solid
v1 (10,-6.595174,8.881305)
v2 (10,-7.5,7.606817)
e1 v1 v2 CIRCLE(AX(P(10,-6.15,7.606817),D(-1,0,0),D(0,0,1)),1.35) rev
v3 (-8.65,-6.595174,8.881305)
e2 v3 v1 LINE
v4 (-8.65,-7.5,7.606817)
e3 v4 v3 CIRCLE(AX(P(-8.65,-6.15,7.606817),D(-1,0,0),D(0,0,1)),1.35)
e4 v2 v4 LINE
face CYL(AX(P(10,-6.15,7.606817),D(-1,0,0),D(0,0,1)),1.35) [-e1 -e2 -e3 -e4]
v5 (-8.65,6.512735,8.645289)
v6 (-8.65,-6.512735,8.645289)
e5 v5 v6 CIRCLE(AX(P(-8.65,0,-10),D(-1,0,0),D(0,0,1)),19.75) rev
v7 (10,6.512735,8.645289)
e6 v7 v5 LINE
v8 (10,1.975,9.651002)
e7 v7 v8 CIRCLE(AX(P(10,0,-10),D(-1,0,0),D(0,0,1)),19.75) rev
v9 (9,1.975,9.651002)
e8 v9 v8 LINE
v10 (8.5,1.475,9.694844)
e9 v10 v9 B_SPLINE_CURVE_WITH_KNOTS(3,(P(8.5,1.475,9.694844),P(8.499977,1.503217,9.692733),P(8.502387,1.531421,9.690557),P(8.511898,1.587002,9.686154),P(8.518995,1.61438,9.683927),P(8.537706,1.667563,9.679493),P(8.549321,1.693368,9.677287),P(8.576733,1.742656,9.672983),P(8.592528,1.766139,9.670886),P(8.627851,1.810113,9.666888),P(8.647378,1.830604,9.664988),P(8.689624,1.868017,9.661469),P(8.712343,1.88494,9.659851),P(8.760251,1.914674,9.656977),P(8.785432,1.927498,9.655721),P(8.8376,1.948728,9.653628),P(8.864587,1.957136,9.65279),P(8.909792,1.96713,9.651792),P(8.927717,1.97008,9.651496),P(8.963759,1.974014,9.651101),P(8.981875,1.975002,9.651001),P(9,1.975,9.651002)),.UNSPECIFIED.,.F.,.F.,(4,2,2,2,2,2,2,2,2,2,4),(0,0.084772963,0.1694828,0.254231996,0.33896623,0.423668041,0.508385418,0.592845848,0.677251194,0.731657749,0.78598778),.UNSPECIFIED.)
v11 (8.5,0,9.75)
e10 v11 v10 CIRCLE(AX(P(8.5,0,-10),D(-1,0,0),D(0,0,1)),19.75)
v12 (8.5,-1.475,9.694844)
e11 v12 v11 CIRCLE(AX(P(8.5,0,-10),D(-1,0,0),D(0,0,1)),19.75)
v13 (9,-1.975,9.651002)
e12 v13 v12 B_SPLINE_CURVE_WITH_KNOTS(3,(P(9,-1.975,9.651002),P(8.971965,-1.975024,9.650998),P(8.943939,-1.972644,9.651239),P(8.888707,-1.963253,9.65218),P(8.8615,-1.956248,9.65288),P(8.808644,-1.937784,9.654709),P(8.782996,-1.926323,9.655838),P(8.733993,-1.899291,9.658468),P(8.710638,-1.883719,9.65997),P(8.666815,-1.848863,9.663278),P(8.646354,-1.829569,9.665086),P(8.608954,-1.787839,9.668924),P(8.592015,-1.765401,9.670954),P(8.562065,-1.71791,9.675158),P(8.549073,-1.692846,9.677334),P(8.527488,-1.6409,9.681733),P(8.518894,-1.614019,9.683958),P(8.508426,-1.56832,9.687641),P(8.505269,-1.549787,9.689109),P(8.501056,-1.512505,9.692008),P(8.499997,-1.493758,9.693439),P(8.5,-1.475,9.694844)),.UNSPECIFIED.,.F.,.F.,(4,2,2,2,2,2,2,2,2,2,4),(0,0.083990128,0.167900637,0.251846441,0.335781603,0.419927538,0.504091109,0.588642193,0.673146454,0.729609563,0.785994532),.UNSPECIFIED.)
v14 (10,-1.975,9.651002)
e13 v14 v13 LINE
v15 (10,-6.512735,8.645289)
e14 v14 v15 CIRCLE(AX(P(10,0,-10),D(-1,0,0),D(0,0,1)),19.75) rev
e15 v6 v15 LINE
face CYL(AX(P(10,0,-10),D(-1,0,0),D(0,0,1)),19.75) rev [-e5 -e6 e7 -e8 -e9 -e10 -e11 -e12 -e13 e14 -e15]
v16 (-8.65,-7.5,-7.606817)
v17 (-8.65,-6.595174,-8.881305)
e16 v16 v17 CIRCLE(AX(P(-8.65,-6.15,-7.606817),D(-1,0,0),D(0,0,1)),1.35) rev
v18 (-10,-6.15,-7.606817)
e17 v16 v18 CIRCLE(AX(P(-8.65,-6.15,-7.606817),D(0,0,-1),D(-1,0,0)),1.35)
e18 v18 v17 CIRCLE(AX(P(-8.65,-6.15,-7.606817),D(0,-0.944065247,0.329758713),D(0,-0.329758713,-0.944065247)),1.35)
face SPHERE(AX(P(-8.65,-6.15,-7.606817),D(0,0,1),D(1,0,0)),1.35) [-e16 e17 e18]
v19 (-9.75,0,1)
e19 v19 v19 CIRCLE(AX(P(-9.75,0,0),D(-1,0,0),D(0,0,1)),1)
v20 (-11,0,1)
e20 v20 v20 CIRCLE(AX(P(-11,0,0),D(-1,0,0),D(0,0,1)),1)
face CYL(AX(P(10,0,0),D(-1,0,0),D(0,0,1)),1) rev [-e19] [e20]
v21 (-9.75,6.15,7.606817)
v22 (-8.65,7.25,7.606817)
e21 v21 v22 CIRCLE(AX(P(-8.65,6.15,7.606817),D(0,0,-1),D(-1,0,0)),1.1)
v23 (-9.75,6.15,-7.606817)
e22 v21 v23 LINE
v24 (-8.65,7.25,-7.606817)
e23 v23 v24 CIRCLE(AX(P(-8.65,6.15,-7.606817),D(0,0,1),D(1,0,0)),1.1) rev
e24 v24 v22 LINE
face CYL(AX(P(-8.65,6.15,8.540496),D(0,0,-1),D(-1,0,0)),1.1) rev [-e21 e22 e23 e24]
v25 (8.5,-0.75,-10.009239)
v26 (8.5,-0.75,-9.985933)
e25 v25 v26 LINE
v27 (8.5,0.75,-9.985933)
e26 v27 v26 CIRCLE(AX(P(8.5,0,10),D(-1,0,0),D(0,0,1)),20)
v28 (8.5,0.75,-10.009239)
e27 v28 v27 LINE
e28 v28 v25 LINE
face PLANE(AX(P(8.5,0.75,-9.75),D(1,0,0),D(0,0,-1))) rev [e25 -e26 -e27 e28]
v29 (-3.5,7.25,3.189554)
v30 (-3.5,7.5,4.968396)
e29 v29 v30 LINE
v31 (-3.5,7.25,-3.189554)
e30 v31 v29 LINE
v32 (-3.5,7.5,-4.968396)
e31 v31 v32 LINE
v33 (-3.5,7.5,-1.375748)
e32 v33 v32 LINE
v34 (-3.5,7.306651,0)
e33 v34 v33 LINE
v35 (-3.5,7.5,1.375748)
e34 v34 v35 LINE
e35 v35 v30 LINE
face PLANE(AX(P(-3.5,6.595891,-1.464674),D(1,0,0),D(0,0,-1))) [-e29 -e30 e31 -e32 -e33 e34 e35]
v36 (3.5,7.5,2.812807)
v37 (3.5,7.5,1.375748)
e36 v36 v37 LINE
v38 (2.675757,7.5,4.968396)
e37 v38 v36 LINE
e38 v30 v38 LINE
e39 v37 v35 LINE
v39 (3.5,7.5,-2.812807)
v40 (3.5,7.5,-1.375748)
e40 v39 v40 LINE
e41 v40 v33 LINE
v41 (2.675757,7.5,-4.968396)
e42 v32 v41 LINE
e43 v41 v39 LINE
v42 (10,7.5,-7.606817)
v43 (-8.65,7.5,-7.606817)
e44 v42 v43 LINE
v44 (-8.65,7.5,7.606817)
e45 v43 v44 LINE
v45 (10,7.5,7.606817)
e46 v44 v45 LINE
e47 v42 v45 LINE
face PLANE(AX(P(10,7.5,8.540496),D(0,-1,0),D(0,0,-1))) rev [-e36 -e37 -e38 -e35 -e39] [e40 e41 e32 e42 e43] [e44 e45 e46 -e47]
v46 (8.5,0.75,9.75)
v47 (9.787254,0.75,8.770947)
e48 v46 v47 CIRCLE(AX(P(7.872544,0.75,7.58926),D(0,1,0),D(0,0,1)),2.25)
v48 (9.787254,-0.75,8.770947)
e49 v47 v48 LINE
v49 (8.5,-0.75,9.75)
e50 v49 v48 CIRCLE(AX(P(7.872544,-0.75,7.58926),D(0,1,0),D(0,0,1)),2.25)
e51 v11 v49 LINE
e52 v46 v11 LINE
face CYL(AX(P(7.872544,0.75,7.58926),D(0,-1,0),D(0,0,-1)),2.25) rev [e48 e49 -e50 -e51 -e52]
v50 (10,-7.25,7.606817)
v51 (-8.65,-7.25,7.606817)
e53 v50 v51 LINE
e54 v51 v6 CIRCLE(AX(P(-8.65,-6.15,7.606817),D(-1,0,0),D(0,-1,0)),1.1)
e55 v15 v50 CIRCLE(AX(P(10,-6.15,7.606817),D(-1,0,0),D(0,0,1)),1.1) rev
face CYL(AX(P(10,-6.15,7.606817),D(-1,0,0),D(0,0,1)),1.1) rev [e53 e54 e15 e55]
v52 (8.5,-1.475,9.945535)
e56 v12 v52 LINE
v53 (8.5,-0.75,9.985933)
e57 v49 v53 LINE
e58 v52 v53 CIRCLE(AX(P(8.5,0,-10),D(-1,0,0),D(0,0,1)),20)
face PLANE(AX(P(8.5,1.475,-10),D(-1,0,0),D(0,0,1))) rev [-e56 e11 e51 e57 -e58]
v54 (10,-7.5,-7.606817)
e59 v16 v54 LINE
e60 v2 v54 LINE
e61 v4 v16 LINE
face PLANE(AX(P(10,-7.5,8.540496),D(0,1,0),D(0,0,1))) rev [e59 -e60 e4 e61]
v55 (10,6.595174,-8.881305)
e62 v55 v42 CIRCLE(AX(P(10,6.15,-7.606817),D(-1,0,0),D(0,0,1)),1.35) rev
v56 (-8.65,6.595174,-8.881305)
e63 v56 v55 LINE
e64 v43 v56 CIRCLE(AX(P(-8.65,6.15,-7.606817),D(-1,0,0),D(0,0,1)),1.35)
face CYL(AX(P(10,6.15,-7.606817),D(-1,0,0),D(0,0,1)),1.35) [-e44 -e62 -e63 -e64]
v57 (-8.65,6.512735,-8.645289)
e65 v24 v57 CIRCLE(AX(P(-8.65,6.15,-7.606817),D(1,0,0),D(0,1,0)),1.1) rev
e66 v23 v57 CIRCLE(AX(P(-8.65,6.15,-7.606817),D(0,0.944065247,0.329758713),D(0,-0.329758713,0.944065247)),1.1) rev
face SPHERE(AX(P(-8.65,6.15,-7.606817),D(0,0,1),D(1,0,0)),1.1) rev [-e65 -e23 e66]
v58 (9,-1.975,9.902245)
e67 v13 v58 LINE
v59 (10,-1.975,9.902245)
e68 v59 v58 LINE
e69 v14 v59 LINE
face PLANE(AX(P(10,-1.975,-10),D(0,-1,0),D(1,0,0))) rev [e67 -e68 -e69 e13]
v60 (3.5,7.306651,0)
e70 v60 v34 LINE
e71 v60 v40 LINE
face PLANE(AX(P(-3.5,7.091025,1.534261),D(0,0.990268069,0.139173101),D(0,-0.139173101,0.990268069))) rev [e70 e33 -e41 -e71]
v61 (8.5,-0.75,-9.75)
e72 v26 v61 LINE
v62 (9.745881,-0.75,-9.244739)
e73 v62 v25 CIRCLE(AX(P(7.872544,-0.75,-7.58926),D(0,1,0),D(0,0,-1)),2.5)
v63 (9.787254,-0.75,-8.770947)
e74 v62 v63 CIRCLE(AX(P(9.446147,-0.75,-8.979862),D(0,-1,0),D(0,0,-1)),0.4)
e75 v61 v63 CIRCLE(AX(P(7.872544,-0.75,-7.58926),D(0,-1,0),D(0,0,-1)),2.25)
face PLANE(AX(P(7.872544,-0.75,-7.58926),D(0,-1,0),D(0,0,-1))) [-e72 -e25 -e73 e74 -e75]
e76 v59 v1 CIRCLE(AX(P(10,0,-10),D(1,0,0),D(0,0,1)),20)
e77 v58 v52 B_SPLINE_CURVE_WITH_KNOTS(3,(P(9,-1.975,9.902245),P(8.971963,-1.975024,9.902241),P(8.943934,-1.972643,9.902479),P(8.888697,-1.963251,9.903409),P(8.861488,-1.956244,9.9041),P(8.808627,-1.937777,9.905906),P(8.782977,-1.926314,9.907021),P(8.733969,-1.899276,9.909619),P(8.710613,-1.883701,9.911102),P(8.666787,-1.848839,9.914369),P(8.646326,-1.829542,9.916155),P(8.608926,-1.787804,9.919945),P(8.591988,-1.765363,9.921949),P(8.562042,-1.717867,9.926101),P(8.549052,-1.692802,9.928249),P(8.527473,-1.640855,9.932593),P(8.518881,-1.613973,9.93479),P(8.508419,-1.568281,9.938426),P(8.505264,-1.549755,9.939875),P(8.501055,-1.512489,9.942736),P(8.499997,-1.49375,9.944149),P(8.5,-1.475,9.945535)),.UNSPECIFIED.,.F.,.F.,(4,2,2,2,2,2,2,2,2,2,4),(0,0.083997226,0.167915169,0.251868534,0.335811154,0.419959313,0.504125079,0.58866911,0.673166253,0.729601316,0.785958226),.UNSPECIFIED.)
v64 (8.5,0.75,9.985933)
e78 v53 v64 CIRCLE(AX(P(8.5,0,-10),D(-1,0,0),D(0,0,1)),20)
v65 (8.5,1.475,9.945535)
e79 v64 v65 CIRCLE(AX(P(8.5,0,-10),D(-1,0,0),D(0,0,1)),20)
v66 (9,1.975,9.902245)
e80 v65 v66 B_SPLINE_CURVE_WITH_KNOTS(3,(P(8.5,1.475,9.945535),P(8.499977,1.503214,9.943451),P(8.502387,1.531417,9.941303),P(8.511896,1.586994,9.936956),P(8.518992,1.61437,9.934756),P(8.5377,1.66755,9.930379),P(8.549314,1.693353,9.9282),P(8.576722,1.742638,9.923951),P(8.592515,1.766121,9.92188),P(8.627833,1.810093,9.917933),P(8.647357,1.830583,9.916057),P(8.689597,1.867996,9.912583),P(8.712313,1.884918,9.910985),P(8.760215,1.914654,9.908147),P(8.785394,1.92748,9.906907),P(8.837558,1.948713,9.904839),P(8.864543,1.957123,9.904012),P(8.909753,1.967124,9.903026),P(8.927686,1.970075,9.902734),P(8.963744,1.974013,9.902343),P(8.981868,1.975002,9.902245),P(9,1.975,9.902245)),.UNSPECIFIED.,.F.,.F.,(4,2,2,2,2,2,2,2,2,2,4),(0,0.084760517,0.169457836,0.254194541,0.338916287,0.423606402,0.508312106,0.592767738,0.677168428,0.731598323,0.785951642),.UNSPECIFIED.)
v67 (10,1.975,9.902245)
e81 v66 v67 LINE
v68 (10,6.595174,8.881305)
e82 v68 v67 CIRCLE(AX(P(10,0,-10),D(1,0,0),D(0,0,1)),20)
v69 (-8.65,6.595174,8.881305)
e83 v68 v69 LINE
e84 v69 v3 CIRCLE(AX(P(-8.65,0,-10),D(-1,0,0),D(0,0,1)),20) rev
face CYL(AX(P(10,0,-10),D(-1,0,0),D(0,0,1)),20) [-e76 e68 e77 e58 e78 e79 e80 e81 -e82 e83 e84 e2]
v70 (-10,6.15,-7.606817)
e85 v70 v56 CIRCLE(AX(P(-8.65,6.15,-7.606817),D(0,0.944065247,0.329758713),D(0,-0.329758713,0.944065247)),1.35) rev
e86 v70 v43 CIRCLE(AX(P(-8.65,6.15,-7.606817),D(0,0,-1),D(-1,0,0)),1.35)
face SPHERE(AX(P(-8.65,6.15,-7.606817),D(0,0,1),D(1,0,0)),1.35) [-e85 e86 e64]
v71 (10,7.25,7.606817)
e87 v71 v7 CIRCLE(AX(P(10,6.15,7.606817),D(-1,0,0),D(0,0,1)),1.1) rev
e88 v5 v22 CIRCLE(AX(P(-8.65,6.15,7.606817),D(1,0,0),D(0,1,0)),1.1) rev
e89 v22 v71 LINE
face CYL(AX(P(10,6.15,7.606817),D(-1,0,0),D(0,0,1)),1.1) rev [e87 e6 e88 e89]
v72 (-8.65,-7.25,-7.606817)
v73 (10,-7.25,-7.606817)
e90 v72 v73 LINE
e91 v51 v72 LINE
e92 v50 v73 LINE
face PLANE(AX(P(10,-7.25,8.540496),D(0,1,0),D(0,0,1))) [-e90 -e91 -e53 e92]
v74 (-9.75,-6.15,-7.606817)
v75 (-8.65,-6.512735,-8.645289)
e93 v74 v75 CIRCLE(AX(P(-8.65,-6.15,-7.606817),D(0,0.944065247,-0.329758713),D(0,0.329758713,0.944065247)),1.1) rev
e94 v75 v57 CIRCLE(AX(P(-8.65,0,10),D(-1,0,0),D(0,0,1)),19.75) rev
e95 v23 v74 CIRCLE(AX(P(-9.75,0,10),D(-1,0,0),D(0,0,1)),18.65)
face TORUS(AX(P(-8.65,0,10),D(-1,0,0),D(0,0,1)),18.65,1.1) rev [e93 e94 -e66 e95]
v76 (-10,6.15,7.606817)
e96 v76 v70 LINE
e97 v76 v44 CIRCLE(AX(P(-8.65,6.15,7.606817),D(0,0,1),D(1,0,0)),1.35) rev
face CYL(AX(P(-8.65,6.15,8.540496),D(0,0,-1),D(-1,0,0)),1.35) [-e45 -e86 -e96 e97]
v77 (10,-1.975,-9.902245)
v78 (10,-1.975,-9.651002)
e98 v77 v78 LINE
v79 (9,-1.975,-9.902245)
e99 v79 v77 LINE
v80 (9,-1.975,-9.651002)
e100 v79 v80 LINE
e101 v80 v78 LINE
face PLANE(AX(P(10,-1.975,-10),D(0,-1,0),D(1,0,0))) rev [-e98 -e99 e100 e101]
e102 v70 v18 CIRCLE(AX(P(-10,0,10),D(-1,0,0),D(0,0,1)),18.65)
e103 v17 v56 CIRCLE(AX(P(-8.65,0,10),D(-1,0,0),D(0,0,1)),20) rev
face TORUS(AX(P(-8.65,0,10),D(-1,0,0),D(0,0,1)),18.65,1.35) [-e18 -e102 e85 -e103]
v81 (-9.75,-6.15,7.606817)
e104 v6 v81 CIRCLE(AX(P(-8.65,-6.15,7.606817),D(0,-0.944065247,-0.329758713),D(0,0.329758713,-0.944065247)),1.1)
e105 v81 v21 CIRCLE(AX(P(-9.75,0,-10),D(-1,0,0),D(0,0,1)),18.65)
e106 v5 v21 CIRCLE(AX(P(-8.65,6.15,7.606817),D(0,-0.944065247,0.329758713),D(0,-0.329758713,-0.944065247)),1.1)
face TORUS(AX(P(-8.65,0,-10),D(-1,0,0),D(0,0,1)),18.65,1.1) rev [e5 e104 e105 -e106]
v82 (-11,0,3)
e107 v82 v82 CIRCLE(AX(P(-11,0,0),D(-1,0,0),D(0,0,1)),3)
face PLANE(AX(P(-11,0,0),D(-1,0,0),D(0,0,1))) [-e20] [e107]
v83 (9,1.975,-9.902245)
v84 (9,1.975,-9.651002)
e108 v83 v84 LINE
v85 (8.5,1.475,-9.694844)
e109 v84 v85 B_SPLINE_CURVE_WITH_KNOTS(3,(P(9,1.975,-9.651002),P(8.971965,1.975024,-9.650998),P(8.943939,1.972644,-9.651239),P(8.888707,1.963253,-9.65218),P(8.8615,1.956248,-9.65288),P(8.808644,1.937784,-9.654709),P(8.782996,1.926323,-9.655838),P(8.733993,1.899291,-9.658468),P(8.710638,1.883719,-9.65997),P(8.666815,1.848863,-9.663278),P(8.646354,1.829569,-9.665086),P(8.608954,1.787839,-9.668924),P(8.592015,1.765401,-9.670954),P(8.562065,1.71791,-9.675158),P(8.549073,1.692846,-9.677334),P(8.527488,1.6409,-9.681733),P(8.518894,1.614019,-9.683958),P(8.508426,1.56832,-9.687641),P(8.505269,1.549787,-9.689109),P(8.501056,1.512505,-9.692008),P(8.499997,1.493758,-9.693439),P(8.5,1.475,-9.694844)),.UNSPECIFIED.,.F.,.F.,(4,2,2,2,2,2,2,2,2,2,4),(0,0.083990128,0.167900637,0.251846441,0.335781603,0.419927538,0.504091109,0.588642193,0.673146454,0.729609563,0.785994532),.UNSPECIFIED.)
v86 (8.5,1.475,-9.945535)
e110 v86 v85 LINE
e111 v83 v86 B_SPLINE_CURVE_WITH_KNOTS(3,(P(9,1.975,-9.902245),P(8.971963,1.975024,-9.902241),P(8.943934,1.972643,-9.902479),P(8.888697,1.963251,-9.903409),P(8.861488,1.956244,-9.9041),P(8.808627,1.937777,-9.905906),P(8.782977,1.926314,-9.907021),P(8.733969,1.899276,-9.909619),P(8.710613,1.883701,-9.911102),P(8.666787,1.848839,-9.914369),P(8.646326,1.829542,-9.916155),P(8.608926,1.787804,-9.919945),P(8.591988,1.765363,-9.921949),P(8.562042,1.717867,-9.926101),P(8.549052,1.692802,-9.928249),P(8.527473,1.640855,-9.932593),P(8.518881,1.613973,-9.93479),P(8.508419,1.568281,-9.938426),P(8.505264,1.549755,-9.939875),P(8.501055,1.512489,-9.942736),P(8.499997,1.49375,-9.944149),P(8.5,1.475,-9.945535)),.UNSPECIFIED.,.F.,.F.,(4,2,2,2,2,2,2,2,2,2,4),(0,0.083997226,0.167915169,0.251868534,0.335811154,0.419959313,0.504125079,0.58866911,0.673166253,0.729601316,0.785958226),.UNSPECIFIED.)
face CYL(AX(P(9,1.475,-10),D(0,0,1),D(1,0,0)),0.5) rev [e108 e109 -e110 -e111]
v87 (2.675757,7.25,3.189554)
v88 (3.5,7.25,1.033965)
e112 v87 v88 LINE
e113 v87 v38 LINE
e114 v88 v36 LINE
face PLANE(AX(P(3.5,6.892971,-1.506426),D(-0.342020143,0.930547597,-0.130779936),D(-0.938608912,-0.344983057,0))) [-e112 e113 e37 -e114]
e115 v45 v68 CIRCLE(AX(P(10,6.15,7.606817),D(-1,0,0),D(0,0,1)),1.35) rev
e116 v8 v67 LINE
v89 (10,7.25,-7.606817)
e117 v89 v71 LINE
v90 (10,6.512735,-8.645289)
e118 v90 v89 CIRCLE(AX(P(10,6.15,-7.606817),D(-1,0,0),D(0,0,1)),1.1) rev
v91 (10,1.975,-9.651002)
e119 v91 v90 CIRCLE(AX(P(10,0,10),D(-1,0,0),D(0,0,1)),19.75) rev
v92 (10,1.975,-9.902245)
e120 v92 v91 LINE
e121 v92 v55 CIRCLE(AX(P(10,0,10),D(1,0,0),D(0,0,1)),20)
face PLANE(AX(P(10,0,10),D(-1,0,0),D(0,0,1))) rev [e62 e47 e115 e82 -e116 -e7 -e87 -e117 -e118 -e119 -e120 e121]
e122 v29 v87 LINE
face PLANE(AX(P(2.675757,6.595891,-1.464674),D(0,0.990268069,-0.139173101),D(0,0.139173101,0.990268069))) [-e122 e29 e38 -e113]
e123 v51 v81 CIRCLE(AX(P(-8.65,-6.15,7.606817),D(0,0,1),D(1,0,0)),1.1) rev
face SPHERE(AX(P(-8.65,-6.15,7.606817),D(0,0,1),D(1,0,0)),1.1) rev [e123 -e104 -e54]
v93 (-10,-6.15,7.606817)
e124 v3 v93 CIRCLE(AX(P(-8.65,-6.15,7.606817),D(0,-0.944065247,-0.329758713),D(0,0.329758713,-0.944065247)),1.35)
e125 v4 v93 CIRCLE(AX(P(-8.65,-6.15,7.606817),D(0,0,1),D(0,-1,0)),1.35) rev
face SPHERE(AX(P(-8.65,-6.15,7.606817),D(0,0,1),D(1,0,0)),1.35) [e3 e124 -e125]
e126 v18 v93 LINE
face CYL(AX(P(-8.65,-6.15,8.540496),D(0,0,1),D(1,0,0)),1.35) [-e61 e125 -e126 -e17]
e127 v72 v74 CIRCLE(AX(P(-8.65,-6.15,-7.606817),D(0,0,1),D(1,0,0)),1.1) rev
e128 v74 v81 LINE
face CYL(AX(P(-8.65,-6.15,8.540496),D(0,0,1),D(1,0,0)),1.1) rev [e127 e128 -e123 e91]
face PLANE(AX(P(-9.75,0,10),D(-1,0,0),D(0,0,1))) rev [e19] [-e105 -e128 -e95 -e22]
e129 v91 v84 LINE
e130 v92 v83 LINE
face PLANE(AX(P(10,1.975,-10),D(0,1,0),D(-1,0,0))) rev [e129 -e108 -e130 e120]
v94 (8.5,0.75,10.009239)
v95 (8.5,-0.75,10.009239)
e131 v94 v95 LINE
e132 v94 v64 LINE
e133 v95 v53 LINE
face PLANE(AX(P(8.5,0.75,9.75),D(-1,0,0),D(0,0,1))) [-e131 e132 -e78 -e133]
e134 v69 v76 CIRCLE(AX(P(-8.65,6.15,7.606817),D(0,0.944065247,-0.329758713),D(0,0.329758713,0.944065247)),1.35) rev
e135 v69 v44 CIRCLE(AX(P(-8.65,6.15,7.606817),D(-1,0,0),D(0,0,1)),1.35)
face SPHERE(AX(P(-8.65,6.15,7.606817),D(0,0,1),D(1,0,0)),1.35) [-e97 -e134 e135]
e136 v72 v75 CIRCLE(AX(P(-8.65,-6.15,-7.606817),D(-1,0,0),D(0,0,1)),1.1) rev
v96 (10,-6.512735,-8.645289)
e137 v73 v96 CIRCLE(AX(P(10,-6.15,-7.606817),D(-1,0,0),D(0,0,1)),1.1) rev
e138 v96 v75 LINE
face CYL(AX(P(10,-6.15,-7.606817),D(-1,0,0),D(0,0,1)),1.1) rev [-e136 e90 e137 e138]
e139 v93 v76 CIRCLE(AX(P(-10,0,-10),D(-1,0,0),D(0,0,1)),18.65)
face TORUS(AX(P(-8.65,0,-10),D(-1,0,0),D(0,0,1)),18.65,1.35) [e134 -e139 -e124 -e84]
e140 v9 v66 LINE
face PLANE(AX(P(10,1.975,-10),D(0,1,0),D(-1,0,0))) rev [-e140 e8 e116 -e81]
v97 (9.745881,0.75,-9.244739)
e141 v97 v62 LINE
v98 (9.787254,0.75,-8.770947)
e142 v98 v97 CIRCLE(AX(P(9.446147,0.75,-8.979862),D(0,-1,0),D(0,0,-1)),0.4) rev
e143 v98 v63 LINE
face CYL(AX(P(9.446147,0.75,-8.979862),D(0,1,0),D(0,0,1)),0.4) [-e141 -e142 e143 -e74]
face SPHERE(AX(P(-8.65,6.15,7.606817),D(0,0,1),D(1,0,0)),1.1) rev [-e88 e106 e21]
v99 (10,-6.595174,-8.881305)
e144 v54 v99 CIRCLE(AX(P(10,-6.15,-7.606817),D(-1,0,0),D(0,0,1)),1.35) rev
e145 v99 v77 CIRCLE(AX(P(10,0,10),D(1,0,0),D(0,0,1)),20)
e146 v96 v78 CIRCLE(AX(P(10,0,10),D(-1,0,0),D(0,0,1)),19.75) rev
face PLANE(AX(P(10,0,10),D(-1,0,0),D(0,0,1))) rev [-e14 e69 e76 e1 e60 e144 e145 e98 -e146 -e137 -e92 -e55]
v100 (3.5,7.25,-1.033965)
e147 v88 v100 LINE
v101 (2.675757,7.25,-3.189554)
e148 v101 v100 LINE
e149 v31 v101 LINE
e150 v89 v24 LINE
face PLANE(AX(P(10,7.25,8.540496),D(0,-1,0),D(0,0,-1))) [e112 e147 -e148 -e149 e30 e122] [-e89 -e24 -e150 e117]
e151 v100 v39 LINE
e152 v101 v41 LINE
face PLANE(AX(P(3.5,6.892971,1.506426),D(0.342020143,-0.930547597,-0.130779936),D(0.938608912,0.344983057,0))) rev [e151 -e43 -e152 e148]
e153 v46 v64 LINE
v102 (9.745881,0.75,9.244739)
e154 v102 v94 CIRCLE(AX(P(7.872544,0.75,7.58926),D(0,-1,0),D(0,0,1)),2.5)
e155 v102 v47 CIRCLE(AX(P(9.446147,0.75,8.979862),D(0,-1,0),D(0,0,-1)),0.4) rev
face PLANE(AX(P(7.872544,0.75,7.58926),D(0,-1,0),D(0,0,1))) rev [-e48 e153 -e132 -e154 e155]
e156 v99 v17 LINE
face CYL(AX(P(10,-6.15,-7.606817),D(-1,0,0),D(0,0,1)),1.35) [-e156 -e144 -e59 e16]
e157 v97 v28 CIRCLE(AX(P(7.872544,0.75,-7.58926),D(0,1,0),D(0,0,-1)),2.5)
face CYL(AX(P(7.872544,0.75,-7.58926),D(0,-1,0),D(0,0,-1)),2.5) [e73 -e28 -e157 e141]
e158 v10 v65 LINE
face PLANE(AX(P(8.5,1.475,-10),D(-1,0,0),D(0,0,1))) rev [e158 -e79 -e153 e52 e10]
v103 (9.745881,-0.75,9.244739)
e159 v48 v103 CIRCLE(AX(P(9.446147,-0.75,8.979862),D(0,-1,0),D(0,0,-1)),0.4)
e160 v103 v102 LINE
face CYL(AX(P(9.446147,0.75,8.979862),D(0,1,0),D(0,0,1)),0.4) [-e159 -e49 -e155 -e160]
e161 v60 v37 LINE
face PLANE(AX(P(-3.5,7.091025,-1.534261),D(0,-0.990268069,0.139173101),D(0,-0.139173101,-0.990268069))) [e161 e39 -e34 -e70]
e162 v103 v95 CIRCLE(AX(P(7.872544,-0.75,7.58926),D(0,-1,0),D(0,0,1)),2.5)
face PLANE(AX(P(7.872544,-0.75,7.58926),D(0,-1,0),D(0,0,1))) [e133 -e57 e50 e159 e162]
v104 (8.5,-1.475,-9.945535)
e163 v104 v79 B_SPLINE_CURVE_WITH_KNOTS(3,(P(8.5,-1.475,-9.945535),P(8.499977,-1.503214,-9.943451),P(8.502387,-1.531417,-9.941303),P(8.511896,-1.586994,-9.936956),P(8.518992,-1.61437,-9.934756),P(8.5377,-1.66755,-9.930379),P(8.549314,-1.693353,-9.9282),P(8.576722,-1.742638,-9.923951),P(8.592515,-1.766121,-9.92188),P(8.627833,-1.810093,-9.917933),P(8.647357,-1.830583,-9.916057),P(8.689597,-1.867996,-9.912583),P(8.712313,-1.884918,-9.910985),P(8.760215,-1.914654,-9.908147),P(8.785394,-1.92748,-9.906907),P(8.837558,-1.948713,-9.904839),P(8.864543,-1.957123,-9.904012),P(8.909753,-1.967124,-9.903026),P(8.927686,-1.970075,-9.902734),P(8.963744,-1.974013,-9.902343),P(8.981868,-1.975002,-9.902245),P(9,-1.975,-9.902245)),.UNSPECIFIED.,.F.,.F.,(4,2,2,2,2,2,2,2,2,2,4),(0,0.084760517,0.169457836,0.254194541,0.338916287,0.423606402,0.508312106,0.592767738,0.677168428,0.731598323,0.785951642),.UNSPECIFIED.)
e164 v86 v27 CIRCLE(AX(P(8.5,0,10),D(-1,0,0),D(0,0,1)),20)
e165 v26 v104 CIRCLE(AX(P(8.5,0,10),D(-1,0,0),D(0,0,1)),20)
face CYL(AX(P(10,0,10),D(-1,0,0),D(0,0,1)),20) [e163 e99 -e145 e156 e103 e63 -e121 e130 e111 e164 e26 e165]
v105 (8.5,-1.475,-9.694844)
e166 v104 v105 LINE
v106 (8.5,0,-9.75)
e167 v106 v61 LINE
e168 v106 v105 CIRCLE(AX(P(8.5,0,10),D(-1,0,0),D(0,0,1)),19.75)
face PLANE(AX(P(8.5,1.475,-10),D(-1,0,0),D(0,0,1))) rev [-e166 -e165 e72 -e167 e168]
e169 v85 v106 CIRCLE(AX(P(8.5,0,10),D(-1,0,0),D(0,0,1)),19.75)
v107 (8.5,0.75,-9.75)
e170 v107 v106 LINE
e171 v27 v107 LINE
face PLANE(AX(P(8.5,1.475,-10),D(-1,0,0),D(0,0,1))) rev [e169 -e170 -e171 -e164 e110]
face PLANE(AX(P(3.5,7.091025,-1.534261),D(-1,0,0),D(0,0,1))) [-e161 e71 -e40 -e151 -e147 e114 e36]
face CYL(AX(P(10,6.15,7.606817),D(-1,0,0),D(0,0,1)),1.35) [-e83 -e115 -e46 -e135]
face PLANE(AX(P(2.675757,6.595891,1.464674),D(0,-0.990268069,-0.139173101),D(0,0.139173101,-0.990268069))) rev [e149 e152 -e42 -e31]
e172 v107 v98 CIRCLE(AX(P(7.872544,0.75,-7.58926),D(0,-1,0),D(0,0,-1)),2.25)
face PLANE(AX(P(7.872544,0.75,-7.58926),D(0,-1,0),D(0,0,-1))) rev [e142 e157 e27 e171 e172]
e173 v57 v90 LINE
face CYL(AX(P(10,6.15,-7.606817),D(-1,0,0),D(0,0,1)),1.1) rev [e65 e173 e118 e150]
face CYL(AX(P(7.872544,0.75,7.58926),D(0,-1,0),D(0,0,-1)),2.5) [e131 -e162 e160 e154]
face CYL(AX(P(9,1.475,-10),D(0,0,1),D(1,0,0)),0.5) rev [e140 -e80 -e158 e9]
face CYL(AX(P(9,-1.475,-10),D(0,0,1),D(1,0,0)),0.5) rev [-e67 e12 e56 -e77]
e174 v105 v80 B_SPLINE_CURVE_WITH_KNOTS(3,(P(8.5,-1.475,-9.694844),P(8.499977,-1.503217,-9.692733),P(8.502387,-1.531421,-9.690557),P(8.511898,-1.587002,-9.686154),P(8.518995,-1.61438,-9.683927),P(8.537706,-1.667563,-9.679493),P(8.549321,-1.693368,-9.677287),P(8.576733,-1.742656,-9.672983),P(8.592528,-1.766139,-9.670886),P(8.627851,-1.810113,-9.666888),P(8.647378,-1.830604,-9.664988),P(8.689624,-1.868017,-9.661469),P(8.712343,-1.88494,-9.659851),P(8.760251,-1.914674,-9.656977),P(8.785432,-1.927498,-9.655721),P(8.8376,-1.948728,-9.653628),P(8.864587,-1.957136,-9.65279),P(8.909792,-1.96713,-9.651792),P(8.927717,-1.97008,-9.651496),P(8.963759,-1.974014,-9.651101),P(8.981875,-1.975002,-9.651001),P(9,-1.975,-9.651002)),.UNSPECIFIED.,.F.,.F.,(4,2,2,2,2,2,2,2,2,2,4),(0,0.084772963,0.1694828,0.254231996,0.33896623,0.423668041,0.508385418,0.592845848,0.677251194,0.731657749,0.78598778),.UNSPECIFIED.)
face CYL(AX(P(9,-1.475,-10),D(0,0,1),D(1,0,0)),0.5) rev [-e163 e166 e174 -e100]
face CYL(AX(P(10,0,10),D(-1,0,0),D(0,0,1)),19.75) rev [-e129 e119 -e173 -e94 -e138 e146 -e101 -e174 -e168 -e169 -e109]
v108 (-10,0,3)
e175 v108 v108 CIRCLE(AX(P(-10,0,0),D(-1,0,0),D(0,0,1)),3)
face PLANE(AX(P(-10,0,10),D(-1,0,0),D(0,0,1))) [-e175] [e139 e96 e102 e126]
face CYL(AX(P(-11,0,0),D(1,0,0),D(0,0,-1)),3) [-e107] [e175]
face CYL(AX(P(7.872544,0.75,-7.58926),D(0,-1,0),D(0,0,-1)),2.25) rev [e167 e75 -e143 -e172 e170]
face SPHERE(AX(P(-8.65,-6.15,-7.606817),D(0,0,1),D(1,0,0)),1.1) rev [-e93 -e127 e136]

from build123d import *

# Parameters (mm, degrees)
BOSS_EXTRUDE1_DEPTH       = 10
SKETCH2_R                 = 3
BOSS_EXTRUDE3_DEPTH       = 1
FILLET2_R                 = 1.35
SHELL6_T                  = -0.25
SHELL6_THICKNESS_2_FACE_R = 2.75
SHELL6_THICKNESS_2_DEPTH  = 1
SKETCH3_R                 = 1
CUT_EXTRUDE2_DEPTH        = 25.438698861
CUT_EXTRUDE6_DEPTH        = 10
CUT_EXTRUDE9_DEPTH        = 17.650825865
CUT_EXTRUDE9_DEPTH_BACK   = 17.650825865
BOSS_EXTRUDE4_DEPTH       = 0.75
FILLET3_R                 = 0.4
FILLET3_OF_MIRROR2_R      = 0.4


with BuildPart() as part:
    # Sketch1 → Boss-Extrude1 (new, symmetric)
    with BuildSketch(Plane(origin=(0, 0, 0), x_dir=(0, 0, -1), z_dir=(1, 0, 0))):
        with BuildLine():
            Line((-8.540496218, -7.5), (8.540496218, -7.5))
            ThreePointArc((8.540496218, -7.5), (10, 0), (8.540496218, 7.5))
            Line((8.540496218, 7.5), (-8.540496218, 7.5))
            ThreePointArc((-8.540496218, 7.5), (-10, 0), (-8.540496218, -7.5))
        make_face()
    extrude(amount=BOSS_EXTRUDE1_DEPTH, both=True)

    # Sketch2 → Boss-Extrude3 (add)
    with BuildSketch(Plane.ZY.offset(10)):
        Circle(SKETCH2_R)
    extrude(amount=BOSS_EXTRUDE3_DEPTH)

    # Fillet2
    fillet2_edges = [part.edges().sort_by_distance(p)[0] for p in [
        (-10, -7.5, 0),
        (-10, 0, 10),
        (-10, 7.5, 0),
        (-10, 0, -10),
        (0, -7.5, -8.540496218),
        (0, -7.5, 8.540496218),
        (0, 7.5, 8.540496218),
        (0, 7.5, -8.540496218),
    ]]
    fillet(fillet2_edges, radius=FILLET2_R)

    # Shell6
    shell6_openings = [part.faces().sort_by_distance(p)[0] for p in [
        (10, 0, 0),
    ]]
    offset(amount=SHELL6_T, openings=shell6_openings, kind=Kind.INTERSECTION)

    # Shell6 thickness 2 face (on inner face of the shell) → Shell6 thickness 2 (add)
    with BuildSketch(Plane(origin=(-10.75, 0, 0), x_dir=(0, 0, -1), z_dir=(-1, 0, 0))):
        Circle(SHELL6_THICKNESS_2_FACE_R)
    extrude(amount=-SHELL6_THICKNESS_2_DEPTH)

    # Sketch3 → Cut-Extrude2 (cut, through all)
    with BuildSketch(Plane.ZY.offset(11)):
        Circle(SKETCH3_R)
    extrude(amount=-CUT_EXTRUDE2_DEPTH, mode=Mode.SUBTRACT)

    # Sketch8 → Cut-Extrude6 (cut)
    with BuildSketch(Plane(origin=(0, 1.317628396, 9.375413194), x_dir=(-1, 0, 0), z_dir=(0, -0.13917310096005872, -0.9902680687415713))):
        Polygon((3.5, 6.735543413), (3.5, 7.235543413), (-3.5, 7.235543413), (-3.5, 7.035543413), (-2.675756774, 6.735543413), align=None)
    cut_extrude6 = extrude(amount=CUT_EXTRUDE6_DEPTH, mode=Mode.SUBTRACT)

    # Mirror1: Cut-Extrude6 across plane
    add(cut_extrude6.mirror(Plane.XY), mode=Mode.SUBTRACT)

    # Sketch9 → Cut-Extrude9 (cut, two sides: drawn at the far end of the back side and taken through both)
    with BuildSketch(Plane.XY.offset(-CUT_EXTRUDE9_DEPTH_BACK)):
        with BuildLine():
            Line((10, 1.975), (9, 1.975))
            ThreePointArc((9, 1.975), (8.646446609, 1.828553391), (8.5, 1.475))
            Line((8.5, 1.475), (8.5, -1.475))
            ThreePointArc((8.5, -1.475), (8.646446609, -1.828553391), (9, -1.975))
            Line((9, -1.975), (10, -1.975))
            Line((10, -1.975), (10, 1.975))
        make_face()
    extrude(amount=CUT_EXTRUDE9_DEPTH + CUT_EXTRUDE9_DEPTH_BACK, mode=Mode.SUBTRACT)

    # Sketch10 → Boss-Extrude4 (add, symmetric)
    with BuildSketch(Plane(origin=(0, 0, 0), x_dir=(1, 0, 0), z_dir=(0, 1, 0))):
        with BuildLine():
            Line((9.787254425, 8.770946884), (10, 8.902245476))
            ThreePointArc((10, 8.902245476), (9.357045131, 9.600790595), (8.5, 10.009238743))
            Line((8.5, 10.009238743), (8.5, 9.75))
            ThreePointArc((8.5, 9.75), (9.234633876, 9.380128574), (9.787254425, 8.770946884))
        make_face()
    boss_extrude4 = extrude(amount=BOSS_EXTRUDE4_DEPTH, both=True)

    # Fillet3
    # the kernel refuses this fillet: 0.4 mm, written as the material it takes off along each edge
    with BuildSketch(Plane(origin=(10, -1.816179824, -8.902245476), x_dir=(-0.5958644657963694, 0, -0.8030850131842876), z_dir=(0, 1, 0))) as fillet3_piece_1:
        with BuildLine():
            CenterArc((0.392354175, 0.398542317), FILLET3_R, 201.939875172, 72.953078249)
            Line((0.021323596, 0.249088948), (0.013902985, 0.246099881))
            ThreePointArc((0.013902985, 0.246099881), (0.002690952, 0.125226829), (-0.007970846, 0.000682355))
            Line((-0.007970846, 0.000682355), (-0.000682355, -0.007970846))
            ThreePointArc((-0.000682355, -0.007970846), (0.213235965, -0.017110516), (0.427154285, -0.007970846))
            Line((0.427154285, -0.007970846), (0.42647193, 0))
        make_face()
    extrude(amount=3.632359649, mode=Mode.SUBTRACT)

    # Mirror2: Boss-Extrude4 across plane
    add(boss_extrude4.mirror(Plane.XY))

    # Fillet3 of Mirror2
    # the kernel refuses this fillet: 0.4 mm, written as the material it takes off along each edge
    with BuildSketch(Plane(origin=(10, -1.816179824, 8.902245476), x_dir=(-0.5958644657963694, 0, 0.8030850131842876), z_dir=(0, 1, 0))) as fillet3_of_mirror2_piece_1:
        with BuildLine():
            CenterArc((0.392354175, -0.398542317), FILLET3_OF_MIRROR2_R, 85.10704658, 72.953078249)
            Line((0.021323596, -0.249088948), (0.013902985, -0.246099881))
            ThreePointArc((0.013902985, -0.246099881), (0.002690952, -0.125226829), (-0.007970846, -0.000682355))
            Line((-0.007970846, -0.000682355), (-0.000682355, 0.007970846))
            ThreePointArc((-0.000682355, 0.007970846), (0.213235965, 0.017110516), (0.427154285, 0.007970846))
            Line((0.427154285, 0.007970846), (0.42647193, 0))
        make_face()
    extrude(amount=3.632359649, mode=Mode.SUBTRACT)


solid = part.part
